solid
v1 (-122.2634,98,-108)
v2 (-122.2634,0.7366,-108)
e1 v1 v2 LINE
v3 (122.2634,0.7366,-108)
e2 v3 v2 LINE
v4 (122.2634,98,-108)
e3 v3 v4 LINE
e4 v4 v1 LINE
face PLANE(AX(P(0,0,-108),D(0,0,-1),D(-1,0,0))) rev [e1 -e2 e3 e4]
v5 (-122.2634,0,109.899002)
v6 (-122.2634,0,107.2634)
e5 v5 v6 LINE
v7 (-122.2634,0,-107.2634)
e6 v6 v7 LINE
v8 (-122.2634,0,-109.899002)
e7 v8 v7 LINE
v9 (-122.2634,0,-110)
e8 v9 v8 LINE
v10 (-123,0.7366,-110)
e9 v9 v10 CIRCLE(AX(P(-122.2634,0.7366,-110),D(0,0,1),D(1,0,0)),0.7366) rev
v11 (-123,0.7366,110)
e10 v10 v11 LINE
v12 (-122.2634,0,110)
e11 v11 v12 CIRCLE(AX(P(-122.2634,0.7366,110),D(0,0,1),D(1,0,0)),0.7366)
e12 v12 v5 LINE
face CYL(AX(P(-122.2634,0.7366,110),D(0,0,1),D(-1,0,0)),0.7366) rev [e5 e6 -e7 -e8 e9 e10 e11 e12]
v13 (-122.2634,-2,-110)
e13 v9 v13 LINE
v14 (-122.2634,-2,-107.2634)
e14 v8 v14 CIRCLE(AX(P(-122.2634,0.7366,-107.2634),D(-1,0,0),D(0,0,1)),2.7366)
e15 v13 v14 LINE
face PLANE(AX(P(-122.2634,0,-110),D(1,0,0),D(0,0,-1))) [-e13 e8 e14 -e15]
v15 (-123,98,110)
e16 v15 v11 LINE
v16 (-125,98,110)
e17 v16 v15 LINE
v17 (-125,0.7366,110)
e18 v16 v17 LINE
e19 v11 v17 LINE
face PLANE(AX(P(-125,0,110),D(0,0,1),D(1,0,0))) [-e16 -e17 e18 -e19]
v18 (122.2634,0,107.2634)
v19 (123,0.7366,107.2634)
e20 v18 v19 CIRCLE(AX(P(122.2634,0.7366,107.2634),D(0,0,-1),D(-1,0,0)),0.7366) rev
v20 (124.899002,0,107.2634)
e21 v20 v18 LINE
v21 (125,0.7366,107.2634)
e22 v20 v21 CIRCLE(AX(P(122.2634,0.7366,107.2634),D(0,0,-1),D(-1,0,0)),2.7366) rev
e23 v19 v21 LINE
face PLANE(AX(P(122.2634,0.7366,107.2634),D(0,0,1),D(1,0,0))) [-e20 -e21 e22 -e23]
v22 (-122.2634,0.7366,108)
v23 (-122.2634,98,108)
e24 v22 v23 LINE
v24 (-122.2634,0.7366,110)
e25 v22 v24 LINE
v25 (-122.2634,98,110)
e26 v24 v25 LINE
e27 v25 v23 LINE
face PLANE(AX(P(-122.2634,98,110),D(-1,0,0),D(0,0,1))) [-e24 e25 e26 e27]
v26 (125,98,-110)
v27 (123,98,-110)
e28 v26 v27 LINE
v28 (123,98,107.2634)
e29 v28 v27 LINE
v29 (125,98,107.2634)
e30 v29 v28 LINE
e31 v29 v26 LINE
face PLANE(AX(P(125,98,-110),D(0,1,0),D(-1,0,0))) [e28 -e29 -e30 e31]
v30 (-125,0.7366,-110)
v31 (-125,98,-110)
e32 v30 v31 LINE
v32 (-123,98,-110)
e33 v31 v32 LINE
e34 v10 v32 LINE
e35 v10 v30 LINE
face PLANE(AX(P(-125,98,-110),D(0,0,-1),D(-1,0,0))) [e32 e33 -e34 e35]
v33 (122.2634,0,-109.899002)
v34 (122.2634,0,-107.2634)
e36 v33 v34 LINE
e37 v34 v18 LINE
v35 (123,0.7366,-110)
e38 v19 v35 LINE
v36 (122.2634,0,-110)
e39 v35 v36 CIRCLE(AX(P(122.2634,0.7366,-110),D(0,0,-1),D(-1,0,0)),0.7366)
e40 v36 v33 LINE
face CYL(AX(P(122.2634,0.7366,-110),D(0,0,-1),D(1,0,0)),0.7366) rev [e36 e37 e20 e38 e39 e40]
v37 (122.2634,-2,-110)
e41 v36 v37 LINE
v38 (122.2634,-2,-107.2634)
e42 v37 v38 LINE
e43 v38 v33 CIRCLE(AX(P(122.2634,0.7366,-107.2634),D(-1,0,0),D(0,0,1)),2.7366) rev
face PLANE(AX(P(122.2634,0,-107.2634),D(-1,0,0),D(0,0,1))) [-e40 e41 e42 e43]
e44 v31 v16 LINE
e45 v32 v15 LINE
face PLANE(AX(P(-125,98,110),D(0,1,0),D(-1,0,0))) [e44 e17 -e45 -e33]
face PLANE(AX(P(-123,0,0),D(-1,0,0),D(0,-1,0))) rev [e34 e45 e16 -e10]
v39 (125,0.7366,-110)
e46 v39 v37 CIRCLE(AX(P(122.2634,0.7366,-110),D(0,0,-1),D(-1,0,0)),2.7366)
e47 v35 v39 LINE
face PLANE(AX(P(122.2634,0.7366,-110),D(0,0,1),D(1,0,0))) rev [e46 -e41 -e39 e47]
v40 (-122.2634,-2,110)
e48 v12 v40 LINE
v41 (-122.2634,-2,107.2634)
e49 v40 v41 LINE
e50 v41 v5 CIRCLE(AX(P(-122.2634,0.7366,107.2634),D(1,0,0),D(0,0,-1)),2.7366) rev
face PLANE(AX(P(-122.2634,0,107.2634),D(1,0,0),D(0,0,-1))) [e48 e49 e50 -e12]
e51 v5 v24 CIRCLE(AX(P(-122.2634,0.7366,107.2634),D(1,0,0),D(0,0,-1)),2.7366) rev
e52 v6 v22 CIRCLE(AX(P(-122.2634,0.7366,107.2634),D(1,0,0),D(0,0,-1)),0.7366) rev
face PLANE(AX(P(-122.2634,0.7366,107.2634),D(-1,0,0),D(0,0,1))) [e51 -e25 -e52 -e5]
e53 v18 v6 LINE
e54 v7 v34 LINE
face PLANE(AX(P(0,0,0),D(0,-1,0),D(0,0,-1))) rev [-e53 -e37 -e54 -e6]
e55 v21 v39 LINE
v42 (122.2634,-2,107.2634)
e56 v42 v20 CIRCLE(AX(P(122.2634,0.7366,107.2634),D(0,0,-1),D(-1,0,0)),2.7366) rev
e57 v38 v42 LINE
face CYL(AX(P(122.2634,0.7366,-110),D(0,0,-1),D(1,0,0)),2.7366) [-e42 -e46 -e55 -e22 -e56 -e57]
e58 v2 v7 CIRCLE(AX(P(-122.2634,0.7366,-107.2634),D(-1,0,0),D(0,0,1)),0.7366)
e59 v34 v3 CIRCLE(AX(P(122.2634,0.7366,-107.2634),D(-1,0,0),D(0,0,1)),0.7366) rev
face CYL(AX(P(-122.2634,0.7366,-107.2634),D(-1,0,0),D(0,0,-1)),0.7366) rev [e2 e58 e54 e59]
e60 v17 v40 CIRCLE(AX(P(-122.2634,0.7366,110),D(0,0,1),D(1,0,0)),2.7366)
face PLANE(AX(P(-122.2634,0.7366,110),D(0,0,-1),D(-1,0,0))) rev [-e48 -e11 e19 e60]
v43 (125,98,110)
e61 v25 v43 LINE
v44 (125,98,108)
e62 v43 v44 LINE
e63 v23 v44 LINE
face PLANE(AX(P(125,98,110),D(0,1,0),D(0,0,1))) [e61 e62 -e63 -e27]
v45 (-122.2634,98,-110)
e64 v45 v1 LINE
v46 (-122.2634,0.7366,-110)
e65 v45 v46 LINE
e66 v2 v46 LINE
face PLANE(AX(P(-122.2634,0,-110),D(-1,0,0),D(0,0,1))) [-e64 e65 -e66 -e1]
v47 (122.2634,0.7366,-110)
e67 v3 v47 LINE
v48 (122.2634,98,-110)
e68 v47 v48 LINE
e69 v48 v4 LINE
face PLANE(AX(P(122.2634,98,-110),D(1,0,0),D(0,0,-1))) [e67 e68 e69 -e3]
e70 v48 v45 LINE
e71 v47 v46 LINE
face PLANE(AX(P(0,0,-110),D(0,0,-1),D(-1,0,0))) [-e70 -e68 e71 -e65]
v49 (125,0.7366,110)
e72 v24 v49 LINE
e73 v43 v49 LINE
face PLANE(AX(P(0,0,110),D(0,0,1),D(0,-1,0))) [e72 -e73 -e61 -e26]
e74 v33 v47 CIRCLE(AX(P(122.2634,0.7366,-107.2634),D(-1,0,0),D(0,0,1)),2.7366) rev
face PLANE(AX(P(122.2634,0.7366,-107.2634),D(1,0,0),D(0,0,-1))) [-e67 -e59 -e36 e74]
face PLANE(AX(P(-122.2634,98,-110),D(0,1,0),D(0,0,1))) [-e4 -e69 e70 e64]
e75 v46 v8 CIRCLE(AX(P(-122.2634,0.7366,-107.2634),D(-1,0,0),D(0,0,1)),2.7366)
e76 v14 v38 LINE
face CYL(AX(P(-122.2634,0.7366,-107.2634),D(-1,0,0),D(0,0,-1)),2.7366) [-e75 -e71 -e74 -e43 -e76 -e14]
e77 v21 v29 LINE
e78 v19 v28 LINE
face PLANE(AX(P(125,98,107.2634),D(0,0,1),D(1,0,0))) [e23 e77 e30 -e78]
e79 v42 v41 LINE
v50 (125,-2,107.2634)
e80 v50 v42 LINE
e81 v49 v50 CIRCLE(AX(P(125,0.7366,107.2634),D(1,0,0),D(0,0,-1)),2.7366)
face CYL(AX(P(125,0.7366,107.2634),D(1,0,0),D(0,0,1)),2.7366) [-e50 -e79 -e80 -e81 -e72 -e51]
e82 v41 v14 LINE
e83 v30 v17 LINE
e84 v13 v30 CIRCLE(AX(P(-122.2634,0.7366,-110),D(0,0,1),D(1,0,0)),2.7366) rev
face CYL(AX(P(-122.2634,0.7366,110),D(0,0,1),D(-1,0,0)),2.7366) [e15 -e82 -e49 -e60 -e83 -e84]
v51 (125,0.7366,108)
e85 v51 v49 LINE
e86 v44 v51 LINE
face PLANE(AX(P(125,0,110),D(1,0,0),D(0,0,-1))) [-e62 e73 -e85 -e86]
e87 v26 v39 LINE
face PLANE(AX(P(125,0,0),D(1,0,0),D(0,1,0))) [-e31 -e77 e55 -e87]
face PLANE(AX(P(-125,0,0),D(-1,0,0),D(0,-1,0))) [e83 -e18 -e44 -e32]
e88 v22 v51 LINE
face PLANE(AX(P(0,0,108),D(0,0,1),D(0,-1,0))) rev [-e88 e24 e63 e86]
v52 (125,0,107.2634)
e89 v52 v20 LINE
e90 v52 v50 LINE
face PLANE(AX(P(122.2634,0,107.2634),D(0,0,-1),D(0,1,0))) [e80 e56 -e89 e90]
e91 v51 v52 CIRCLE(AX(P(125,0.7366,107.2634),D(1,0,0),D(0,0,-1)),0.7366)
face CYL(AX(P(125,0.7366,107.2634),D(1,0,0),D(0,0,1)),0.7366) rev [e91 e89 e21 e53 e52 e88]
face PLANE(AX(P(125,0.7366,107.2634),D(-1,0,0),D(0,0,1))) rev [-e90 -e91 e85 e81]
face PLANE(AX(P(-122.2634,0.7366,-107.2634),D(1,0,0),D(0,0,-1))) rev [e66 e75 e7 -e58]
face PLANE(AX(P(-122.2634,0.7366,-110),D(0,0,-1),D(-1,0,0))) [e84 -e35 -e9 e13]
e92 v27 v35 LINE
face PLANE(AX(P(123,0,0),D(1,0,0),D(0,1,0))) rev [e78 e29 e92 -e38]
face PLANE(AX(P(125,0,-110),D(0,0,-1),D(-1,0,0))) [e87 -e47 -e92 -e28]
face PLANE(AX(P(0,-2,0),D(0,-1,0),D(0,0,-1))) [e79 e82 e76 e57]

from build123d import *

# Parameters (mm, degrees)
SKETCH_1_W                       = 250
SKETCH_1_H                       = 220
SM_BASE_FLANGE_1_DEPTH           = 2
SM_EDGE_FLANGE_1_STRIP_W         = 9.4732
SM_EDGE_FLANGE_1_STRIP_H         = 2
SM_EDGE_FLANGE_1_STRIP_CUT_DEPTH = 220
SM_EDGE_FLANGE_1_DEPTH           = 220
SM_EDGE_FLANGE_2_STRIP_W         = 9.4732
SM_EDGE_FLANGE_2_STRIP_H         = 2
SM_EDGE_FLANGE_2_STRIP_CUT_DEPTH = 247.2634
SM_EDGE_FLANGE_2_DEPTH           = 247.2634
SM_EDGE_FLANGE_3_STRIP_W         = 9.4732
SM_EDGE_FLANGE_3_STRIP_H         = 2
SM_EDGE_FLANGE_3_STRIP_CUT_DEPTH = 217.2634
SM_EDGE_FLANGE_3_DEPTH           = 217.2634
SM_EDGE_FLANGE_4_STRIP_W         = 9.4732
SM_EDGE_FLANGE_4_STRIP_H         = 2
SM_EDGE_FLANGE_4_STRIP_CUT_DEPTH = 244.5268
SM_EDGE_FLANGE_4_DEPTH           = 244.5268


# Sheet-metal steps are written as plain solids
with BuildPart() as part:
    # Sketch 1 → 基体-法兰1 (new body)
    with BuildSketch(Plane(origin=(0, 0, 0), x_dir=(1, 0, 0), z_dir=(0, 1, 0))):
        Rectangle(SKETCH_1_W, SKETCH_1_H)
    extrude(amount=-SM_BASE_FLANGE_1_DEPTH)

    # 边线-法兰1 strip (across the edge) → 边线-法兰1 strip cut (cut)
    with BuildSketch(Plane(origin=(-125, 0, -110), x_dir=(1, 0, 0), z_dir=(0, 0, 1))):
        with Locations((-2, -1)):
            Rectangle(SM_EDGE_FLANGE_1_STRIP_W, SM_EDGE_FLANGE_1_STRIP_H)
    extrude(amount=SM_EDGE_FLANGE_1_STRIP_CUT_DEPTH, mode=Mode.SUBTRACT)

    # 边线-法兰1 section (across the edge) → 边线-法兰1 (add)
    with BuildSketch(Plane(origin=(-125, 0, -110), x_dir=(1, 0, 0), z_dir=(0, 0, 1))):
        with BuildLine():
            Line((0, 0.7366), (0, 98))
            Line((0, 98), (2, 98))
            Line((2, 98), (2, 0.7366))
            ThreePointArc((2, 0.7366), (2.215745145, 0.215745145), (2.7366, 0))
            Line((2.7366, 0), (2.7366, -2))
            ThreePointArc((2.7366, -2), (0.801531583, -1.198468417), (0, 0.7366))
        make_face()
    extrude(amount=SM_EDGE_FLANGE_1_DEPTH)

    # 边线-法兰2 strip (across the edge) → 边线-法兰2 strip cut (cut)
    with BuildSketch(Plane(origin=(-122.2634, 0, 110), x_dir=(0, 0, -1), z_dir=(1, 0, 0))):
        with Locations((-2, -1)):
            Rectangle(SM_EDGE_FLANGE_2_STRIP_W, SM_EDGE_FLANGE_2_STRIP_H)
    extrude(amount=SM_EDGE_FLANGE_2_STRIP_CUT_DEPTH, mode=Mode.SUBTRACT)

    # 边线-法兰2 section (across the edge) → 边线-法兰2 (add)
    with BuildSketch(Plane(origin=(-122.2634, 0, 110), x_dir=(0, 0, -1), z_dir=(1, 0, 0))):
        with BuildLine():
            Line((0, 0.7366), (0, 98))
            Line((0, 98), (2, 98))
            Line((2, 98), (2, 0.7366))
            ThreePointArc((2, 0.7366), (2.215745145, 0.215745145), (2.7366, 0))
            Line((2.7366, 0), (2.7366, -2))
            ThreePointArc((2.7366, -2), (0.801531583, -1.198468417), (0, 0.7366))
        make_face()
    extrude(amount=SM_EDGE_FLANGE_2_DEPTH)

    # 边线-法兰3 strip (across the edge) → 边线-法兰3 strip cut (cut)
    with BuildSketch(Plane(origin=(125, 0, 107.2634), x_dir=(-1, 0, 0), z_dir=(0, 0, -1))):
        with Locations((-2, -1)):
            Rectangle(SM_EDGE_FLANGE_3_STRIP_W, SM_EDGE_FLANGE_3_STRIP_H)
    extrude(amount=SM_EDGE_FLANGE_3_STRIP_CUT_DEPTH, mode=Mode.SUBTRACT)

    # 边线-法兰3 section (across the edge) → 边线-法兰3 (add)
    with BuildSketch(Plane(origin=(125, 0, 107.2634), x_dir=(-1, 0, 0), z_dir=(0, 0, -1))):
        with BuildLine():
            Line((0, 0.7366), (0, 98))
            Line((0, 98), (2, 98))
            Line((2, 98), (2, 0.7366))
            ThreePointArc((2, 0.7366), (2.215745145, 0.215745145), (2.7366, 0))
            Line((2.7366, 0), (2.7366, -2))
            ThreePointArc((2.7366, -2), (0.801531583, -1.198468417), (0, 0.7366))
        make_face()
    extrude(amount=SM_EDGE_FLANGE_3_DEPTH)

    # 边线-法兰4 strip (across the edge) → 边线-法兰4 strip cut (cut)
    with BuildSketch(Plane(origin=(122.2634, 0, -110), x_dir=(0, 0, 1), z_dir=(-1, 0, 0))):
        with Locations((-2, -1)):
            Rectangle(SM_EDGE_FLANGE_4_STRIP_W, SM_EDGE_FLANGE_4_STRIP_H)
    extrude(amount=SM_EDGE_FLANGE_4_STRIP_CUT_DEPTH, mode=Mode.SUBTRACT)

    # 边线-法兰4 section (across the edge) → 边线-法兰4 (add)
    with BuildSketch(Plane(origin=(122.2634, 0, -110), x_dir=(0, 0, 1), z_dir=(-1, 0, 0))):
        with BuildLine():
            Line((0, 0.7366), (0, 98))
            Line((0, 98), (2, 98))
            Line((2, 98), (2, 0.7366))
            ThreePointArc((2, 0.7366), (2.215745145, 0.215745145), (2.7366, 0))
            Line((2.7366, 0), (2.7366, -2))
            ThreePointArc((2.7366, -2), (0.801531583, -1.198468417), (0, 0.7366))
        make_face()
    extrude(amount=SM_EDGE_FLANGE_4_DEPTH)


solid = part.part
